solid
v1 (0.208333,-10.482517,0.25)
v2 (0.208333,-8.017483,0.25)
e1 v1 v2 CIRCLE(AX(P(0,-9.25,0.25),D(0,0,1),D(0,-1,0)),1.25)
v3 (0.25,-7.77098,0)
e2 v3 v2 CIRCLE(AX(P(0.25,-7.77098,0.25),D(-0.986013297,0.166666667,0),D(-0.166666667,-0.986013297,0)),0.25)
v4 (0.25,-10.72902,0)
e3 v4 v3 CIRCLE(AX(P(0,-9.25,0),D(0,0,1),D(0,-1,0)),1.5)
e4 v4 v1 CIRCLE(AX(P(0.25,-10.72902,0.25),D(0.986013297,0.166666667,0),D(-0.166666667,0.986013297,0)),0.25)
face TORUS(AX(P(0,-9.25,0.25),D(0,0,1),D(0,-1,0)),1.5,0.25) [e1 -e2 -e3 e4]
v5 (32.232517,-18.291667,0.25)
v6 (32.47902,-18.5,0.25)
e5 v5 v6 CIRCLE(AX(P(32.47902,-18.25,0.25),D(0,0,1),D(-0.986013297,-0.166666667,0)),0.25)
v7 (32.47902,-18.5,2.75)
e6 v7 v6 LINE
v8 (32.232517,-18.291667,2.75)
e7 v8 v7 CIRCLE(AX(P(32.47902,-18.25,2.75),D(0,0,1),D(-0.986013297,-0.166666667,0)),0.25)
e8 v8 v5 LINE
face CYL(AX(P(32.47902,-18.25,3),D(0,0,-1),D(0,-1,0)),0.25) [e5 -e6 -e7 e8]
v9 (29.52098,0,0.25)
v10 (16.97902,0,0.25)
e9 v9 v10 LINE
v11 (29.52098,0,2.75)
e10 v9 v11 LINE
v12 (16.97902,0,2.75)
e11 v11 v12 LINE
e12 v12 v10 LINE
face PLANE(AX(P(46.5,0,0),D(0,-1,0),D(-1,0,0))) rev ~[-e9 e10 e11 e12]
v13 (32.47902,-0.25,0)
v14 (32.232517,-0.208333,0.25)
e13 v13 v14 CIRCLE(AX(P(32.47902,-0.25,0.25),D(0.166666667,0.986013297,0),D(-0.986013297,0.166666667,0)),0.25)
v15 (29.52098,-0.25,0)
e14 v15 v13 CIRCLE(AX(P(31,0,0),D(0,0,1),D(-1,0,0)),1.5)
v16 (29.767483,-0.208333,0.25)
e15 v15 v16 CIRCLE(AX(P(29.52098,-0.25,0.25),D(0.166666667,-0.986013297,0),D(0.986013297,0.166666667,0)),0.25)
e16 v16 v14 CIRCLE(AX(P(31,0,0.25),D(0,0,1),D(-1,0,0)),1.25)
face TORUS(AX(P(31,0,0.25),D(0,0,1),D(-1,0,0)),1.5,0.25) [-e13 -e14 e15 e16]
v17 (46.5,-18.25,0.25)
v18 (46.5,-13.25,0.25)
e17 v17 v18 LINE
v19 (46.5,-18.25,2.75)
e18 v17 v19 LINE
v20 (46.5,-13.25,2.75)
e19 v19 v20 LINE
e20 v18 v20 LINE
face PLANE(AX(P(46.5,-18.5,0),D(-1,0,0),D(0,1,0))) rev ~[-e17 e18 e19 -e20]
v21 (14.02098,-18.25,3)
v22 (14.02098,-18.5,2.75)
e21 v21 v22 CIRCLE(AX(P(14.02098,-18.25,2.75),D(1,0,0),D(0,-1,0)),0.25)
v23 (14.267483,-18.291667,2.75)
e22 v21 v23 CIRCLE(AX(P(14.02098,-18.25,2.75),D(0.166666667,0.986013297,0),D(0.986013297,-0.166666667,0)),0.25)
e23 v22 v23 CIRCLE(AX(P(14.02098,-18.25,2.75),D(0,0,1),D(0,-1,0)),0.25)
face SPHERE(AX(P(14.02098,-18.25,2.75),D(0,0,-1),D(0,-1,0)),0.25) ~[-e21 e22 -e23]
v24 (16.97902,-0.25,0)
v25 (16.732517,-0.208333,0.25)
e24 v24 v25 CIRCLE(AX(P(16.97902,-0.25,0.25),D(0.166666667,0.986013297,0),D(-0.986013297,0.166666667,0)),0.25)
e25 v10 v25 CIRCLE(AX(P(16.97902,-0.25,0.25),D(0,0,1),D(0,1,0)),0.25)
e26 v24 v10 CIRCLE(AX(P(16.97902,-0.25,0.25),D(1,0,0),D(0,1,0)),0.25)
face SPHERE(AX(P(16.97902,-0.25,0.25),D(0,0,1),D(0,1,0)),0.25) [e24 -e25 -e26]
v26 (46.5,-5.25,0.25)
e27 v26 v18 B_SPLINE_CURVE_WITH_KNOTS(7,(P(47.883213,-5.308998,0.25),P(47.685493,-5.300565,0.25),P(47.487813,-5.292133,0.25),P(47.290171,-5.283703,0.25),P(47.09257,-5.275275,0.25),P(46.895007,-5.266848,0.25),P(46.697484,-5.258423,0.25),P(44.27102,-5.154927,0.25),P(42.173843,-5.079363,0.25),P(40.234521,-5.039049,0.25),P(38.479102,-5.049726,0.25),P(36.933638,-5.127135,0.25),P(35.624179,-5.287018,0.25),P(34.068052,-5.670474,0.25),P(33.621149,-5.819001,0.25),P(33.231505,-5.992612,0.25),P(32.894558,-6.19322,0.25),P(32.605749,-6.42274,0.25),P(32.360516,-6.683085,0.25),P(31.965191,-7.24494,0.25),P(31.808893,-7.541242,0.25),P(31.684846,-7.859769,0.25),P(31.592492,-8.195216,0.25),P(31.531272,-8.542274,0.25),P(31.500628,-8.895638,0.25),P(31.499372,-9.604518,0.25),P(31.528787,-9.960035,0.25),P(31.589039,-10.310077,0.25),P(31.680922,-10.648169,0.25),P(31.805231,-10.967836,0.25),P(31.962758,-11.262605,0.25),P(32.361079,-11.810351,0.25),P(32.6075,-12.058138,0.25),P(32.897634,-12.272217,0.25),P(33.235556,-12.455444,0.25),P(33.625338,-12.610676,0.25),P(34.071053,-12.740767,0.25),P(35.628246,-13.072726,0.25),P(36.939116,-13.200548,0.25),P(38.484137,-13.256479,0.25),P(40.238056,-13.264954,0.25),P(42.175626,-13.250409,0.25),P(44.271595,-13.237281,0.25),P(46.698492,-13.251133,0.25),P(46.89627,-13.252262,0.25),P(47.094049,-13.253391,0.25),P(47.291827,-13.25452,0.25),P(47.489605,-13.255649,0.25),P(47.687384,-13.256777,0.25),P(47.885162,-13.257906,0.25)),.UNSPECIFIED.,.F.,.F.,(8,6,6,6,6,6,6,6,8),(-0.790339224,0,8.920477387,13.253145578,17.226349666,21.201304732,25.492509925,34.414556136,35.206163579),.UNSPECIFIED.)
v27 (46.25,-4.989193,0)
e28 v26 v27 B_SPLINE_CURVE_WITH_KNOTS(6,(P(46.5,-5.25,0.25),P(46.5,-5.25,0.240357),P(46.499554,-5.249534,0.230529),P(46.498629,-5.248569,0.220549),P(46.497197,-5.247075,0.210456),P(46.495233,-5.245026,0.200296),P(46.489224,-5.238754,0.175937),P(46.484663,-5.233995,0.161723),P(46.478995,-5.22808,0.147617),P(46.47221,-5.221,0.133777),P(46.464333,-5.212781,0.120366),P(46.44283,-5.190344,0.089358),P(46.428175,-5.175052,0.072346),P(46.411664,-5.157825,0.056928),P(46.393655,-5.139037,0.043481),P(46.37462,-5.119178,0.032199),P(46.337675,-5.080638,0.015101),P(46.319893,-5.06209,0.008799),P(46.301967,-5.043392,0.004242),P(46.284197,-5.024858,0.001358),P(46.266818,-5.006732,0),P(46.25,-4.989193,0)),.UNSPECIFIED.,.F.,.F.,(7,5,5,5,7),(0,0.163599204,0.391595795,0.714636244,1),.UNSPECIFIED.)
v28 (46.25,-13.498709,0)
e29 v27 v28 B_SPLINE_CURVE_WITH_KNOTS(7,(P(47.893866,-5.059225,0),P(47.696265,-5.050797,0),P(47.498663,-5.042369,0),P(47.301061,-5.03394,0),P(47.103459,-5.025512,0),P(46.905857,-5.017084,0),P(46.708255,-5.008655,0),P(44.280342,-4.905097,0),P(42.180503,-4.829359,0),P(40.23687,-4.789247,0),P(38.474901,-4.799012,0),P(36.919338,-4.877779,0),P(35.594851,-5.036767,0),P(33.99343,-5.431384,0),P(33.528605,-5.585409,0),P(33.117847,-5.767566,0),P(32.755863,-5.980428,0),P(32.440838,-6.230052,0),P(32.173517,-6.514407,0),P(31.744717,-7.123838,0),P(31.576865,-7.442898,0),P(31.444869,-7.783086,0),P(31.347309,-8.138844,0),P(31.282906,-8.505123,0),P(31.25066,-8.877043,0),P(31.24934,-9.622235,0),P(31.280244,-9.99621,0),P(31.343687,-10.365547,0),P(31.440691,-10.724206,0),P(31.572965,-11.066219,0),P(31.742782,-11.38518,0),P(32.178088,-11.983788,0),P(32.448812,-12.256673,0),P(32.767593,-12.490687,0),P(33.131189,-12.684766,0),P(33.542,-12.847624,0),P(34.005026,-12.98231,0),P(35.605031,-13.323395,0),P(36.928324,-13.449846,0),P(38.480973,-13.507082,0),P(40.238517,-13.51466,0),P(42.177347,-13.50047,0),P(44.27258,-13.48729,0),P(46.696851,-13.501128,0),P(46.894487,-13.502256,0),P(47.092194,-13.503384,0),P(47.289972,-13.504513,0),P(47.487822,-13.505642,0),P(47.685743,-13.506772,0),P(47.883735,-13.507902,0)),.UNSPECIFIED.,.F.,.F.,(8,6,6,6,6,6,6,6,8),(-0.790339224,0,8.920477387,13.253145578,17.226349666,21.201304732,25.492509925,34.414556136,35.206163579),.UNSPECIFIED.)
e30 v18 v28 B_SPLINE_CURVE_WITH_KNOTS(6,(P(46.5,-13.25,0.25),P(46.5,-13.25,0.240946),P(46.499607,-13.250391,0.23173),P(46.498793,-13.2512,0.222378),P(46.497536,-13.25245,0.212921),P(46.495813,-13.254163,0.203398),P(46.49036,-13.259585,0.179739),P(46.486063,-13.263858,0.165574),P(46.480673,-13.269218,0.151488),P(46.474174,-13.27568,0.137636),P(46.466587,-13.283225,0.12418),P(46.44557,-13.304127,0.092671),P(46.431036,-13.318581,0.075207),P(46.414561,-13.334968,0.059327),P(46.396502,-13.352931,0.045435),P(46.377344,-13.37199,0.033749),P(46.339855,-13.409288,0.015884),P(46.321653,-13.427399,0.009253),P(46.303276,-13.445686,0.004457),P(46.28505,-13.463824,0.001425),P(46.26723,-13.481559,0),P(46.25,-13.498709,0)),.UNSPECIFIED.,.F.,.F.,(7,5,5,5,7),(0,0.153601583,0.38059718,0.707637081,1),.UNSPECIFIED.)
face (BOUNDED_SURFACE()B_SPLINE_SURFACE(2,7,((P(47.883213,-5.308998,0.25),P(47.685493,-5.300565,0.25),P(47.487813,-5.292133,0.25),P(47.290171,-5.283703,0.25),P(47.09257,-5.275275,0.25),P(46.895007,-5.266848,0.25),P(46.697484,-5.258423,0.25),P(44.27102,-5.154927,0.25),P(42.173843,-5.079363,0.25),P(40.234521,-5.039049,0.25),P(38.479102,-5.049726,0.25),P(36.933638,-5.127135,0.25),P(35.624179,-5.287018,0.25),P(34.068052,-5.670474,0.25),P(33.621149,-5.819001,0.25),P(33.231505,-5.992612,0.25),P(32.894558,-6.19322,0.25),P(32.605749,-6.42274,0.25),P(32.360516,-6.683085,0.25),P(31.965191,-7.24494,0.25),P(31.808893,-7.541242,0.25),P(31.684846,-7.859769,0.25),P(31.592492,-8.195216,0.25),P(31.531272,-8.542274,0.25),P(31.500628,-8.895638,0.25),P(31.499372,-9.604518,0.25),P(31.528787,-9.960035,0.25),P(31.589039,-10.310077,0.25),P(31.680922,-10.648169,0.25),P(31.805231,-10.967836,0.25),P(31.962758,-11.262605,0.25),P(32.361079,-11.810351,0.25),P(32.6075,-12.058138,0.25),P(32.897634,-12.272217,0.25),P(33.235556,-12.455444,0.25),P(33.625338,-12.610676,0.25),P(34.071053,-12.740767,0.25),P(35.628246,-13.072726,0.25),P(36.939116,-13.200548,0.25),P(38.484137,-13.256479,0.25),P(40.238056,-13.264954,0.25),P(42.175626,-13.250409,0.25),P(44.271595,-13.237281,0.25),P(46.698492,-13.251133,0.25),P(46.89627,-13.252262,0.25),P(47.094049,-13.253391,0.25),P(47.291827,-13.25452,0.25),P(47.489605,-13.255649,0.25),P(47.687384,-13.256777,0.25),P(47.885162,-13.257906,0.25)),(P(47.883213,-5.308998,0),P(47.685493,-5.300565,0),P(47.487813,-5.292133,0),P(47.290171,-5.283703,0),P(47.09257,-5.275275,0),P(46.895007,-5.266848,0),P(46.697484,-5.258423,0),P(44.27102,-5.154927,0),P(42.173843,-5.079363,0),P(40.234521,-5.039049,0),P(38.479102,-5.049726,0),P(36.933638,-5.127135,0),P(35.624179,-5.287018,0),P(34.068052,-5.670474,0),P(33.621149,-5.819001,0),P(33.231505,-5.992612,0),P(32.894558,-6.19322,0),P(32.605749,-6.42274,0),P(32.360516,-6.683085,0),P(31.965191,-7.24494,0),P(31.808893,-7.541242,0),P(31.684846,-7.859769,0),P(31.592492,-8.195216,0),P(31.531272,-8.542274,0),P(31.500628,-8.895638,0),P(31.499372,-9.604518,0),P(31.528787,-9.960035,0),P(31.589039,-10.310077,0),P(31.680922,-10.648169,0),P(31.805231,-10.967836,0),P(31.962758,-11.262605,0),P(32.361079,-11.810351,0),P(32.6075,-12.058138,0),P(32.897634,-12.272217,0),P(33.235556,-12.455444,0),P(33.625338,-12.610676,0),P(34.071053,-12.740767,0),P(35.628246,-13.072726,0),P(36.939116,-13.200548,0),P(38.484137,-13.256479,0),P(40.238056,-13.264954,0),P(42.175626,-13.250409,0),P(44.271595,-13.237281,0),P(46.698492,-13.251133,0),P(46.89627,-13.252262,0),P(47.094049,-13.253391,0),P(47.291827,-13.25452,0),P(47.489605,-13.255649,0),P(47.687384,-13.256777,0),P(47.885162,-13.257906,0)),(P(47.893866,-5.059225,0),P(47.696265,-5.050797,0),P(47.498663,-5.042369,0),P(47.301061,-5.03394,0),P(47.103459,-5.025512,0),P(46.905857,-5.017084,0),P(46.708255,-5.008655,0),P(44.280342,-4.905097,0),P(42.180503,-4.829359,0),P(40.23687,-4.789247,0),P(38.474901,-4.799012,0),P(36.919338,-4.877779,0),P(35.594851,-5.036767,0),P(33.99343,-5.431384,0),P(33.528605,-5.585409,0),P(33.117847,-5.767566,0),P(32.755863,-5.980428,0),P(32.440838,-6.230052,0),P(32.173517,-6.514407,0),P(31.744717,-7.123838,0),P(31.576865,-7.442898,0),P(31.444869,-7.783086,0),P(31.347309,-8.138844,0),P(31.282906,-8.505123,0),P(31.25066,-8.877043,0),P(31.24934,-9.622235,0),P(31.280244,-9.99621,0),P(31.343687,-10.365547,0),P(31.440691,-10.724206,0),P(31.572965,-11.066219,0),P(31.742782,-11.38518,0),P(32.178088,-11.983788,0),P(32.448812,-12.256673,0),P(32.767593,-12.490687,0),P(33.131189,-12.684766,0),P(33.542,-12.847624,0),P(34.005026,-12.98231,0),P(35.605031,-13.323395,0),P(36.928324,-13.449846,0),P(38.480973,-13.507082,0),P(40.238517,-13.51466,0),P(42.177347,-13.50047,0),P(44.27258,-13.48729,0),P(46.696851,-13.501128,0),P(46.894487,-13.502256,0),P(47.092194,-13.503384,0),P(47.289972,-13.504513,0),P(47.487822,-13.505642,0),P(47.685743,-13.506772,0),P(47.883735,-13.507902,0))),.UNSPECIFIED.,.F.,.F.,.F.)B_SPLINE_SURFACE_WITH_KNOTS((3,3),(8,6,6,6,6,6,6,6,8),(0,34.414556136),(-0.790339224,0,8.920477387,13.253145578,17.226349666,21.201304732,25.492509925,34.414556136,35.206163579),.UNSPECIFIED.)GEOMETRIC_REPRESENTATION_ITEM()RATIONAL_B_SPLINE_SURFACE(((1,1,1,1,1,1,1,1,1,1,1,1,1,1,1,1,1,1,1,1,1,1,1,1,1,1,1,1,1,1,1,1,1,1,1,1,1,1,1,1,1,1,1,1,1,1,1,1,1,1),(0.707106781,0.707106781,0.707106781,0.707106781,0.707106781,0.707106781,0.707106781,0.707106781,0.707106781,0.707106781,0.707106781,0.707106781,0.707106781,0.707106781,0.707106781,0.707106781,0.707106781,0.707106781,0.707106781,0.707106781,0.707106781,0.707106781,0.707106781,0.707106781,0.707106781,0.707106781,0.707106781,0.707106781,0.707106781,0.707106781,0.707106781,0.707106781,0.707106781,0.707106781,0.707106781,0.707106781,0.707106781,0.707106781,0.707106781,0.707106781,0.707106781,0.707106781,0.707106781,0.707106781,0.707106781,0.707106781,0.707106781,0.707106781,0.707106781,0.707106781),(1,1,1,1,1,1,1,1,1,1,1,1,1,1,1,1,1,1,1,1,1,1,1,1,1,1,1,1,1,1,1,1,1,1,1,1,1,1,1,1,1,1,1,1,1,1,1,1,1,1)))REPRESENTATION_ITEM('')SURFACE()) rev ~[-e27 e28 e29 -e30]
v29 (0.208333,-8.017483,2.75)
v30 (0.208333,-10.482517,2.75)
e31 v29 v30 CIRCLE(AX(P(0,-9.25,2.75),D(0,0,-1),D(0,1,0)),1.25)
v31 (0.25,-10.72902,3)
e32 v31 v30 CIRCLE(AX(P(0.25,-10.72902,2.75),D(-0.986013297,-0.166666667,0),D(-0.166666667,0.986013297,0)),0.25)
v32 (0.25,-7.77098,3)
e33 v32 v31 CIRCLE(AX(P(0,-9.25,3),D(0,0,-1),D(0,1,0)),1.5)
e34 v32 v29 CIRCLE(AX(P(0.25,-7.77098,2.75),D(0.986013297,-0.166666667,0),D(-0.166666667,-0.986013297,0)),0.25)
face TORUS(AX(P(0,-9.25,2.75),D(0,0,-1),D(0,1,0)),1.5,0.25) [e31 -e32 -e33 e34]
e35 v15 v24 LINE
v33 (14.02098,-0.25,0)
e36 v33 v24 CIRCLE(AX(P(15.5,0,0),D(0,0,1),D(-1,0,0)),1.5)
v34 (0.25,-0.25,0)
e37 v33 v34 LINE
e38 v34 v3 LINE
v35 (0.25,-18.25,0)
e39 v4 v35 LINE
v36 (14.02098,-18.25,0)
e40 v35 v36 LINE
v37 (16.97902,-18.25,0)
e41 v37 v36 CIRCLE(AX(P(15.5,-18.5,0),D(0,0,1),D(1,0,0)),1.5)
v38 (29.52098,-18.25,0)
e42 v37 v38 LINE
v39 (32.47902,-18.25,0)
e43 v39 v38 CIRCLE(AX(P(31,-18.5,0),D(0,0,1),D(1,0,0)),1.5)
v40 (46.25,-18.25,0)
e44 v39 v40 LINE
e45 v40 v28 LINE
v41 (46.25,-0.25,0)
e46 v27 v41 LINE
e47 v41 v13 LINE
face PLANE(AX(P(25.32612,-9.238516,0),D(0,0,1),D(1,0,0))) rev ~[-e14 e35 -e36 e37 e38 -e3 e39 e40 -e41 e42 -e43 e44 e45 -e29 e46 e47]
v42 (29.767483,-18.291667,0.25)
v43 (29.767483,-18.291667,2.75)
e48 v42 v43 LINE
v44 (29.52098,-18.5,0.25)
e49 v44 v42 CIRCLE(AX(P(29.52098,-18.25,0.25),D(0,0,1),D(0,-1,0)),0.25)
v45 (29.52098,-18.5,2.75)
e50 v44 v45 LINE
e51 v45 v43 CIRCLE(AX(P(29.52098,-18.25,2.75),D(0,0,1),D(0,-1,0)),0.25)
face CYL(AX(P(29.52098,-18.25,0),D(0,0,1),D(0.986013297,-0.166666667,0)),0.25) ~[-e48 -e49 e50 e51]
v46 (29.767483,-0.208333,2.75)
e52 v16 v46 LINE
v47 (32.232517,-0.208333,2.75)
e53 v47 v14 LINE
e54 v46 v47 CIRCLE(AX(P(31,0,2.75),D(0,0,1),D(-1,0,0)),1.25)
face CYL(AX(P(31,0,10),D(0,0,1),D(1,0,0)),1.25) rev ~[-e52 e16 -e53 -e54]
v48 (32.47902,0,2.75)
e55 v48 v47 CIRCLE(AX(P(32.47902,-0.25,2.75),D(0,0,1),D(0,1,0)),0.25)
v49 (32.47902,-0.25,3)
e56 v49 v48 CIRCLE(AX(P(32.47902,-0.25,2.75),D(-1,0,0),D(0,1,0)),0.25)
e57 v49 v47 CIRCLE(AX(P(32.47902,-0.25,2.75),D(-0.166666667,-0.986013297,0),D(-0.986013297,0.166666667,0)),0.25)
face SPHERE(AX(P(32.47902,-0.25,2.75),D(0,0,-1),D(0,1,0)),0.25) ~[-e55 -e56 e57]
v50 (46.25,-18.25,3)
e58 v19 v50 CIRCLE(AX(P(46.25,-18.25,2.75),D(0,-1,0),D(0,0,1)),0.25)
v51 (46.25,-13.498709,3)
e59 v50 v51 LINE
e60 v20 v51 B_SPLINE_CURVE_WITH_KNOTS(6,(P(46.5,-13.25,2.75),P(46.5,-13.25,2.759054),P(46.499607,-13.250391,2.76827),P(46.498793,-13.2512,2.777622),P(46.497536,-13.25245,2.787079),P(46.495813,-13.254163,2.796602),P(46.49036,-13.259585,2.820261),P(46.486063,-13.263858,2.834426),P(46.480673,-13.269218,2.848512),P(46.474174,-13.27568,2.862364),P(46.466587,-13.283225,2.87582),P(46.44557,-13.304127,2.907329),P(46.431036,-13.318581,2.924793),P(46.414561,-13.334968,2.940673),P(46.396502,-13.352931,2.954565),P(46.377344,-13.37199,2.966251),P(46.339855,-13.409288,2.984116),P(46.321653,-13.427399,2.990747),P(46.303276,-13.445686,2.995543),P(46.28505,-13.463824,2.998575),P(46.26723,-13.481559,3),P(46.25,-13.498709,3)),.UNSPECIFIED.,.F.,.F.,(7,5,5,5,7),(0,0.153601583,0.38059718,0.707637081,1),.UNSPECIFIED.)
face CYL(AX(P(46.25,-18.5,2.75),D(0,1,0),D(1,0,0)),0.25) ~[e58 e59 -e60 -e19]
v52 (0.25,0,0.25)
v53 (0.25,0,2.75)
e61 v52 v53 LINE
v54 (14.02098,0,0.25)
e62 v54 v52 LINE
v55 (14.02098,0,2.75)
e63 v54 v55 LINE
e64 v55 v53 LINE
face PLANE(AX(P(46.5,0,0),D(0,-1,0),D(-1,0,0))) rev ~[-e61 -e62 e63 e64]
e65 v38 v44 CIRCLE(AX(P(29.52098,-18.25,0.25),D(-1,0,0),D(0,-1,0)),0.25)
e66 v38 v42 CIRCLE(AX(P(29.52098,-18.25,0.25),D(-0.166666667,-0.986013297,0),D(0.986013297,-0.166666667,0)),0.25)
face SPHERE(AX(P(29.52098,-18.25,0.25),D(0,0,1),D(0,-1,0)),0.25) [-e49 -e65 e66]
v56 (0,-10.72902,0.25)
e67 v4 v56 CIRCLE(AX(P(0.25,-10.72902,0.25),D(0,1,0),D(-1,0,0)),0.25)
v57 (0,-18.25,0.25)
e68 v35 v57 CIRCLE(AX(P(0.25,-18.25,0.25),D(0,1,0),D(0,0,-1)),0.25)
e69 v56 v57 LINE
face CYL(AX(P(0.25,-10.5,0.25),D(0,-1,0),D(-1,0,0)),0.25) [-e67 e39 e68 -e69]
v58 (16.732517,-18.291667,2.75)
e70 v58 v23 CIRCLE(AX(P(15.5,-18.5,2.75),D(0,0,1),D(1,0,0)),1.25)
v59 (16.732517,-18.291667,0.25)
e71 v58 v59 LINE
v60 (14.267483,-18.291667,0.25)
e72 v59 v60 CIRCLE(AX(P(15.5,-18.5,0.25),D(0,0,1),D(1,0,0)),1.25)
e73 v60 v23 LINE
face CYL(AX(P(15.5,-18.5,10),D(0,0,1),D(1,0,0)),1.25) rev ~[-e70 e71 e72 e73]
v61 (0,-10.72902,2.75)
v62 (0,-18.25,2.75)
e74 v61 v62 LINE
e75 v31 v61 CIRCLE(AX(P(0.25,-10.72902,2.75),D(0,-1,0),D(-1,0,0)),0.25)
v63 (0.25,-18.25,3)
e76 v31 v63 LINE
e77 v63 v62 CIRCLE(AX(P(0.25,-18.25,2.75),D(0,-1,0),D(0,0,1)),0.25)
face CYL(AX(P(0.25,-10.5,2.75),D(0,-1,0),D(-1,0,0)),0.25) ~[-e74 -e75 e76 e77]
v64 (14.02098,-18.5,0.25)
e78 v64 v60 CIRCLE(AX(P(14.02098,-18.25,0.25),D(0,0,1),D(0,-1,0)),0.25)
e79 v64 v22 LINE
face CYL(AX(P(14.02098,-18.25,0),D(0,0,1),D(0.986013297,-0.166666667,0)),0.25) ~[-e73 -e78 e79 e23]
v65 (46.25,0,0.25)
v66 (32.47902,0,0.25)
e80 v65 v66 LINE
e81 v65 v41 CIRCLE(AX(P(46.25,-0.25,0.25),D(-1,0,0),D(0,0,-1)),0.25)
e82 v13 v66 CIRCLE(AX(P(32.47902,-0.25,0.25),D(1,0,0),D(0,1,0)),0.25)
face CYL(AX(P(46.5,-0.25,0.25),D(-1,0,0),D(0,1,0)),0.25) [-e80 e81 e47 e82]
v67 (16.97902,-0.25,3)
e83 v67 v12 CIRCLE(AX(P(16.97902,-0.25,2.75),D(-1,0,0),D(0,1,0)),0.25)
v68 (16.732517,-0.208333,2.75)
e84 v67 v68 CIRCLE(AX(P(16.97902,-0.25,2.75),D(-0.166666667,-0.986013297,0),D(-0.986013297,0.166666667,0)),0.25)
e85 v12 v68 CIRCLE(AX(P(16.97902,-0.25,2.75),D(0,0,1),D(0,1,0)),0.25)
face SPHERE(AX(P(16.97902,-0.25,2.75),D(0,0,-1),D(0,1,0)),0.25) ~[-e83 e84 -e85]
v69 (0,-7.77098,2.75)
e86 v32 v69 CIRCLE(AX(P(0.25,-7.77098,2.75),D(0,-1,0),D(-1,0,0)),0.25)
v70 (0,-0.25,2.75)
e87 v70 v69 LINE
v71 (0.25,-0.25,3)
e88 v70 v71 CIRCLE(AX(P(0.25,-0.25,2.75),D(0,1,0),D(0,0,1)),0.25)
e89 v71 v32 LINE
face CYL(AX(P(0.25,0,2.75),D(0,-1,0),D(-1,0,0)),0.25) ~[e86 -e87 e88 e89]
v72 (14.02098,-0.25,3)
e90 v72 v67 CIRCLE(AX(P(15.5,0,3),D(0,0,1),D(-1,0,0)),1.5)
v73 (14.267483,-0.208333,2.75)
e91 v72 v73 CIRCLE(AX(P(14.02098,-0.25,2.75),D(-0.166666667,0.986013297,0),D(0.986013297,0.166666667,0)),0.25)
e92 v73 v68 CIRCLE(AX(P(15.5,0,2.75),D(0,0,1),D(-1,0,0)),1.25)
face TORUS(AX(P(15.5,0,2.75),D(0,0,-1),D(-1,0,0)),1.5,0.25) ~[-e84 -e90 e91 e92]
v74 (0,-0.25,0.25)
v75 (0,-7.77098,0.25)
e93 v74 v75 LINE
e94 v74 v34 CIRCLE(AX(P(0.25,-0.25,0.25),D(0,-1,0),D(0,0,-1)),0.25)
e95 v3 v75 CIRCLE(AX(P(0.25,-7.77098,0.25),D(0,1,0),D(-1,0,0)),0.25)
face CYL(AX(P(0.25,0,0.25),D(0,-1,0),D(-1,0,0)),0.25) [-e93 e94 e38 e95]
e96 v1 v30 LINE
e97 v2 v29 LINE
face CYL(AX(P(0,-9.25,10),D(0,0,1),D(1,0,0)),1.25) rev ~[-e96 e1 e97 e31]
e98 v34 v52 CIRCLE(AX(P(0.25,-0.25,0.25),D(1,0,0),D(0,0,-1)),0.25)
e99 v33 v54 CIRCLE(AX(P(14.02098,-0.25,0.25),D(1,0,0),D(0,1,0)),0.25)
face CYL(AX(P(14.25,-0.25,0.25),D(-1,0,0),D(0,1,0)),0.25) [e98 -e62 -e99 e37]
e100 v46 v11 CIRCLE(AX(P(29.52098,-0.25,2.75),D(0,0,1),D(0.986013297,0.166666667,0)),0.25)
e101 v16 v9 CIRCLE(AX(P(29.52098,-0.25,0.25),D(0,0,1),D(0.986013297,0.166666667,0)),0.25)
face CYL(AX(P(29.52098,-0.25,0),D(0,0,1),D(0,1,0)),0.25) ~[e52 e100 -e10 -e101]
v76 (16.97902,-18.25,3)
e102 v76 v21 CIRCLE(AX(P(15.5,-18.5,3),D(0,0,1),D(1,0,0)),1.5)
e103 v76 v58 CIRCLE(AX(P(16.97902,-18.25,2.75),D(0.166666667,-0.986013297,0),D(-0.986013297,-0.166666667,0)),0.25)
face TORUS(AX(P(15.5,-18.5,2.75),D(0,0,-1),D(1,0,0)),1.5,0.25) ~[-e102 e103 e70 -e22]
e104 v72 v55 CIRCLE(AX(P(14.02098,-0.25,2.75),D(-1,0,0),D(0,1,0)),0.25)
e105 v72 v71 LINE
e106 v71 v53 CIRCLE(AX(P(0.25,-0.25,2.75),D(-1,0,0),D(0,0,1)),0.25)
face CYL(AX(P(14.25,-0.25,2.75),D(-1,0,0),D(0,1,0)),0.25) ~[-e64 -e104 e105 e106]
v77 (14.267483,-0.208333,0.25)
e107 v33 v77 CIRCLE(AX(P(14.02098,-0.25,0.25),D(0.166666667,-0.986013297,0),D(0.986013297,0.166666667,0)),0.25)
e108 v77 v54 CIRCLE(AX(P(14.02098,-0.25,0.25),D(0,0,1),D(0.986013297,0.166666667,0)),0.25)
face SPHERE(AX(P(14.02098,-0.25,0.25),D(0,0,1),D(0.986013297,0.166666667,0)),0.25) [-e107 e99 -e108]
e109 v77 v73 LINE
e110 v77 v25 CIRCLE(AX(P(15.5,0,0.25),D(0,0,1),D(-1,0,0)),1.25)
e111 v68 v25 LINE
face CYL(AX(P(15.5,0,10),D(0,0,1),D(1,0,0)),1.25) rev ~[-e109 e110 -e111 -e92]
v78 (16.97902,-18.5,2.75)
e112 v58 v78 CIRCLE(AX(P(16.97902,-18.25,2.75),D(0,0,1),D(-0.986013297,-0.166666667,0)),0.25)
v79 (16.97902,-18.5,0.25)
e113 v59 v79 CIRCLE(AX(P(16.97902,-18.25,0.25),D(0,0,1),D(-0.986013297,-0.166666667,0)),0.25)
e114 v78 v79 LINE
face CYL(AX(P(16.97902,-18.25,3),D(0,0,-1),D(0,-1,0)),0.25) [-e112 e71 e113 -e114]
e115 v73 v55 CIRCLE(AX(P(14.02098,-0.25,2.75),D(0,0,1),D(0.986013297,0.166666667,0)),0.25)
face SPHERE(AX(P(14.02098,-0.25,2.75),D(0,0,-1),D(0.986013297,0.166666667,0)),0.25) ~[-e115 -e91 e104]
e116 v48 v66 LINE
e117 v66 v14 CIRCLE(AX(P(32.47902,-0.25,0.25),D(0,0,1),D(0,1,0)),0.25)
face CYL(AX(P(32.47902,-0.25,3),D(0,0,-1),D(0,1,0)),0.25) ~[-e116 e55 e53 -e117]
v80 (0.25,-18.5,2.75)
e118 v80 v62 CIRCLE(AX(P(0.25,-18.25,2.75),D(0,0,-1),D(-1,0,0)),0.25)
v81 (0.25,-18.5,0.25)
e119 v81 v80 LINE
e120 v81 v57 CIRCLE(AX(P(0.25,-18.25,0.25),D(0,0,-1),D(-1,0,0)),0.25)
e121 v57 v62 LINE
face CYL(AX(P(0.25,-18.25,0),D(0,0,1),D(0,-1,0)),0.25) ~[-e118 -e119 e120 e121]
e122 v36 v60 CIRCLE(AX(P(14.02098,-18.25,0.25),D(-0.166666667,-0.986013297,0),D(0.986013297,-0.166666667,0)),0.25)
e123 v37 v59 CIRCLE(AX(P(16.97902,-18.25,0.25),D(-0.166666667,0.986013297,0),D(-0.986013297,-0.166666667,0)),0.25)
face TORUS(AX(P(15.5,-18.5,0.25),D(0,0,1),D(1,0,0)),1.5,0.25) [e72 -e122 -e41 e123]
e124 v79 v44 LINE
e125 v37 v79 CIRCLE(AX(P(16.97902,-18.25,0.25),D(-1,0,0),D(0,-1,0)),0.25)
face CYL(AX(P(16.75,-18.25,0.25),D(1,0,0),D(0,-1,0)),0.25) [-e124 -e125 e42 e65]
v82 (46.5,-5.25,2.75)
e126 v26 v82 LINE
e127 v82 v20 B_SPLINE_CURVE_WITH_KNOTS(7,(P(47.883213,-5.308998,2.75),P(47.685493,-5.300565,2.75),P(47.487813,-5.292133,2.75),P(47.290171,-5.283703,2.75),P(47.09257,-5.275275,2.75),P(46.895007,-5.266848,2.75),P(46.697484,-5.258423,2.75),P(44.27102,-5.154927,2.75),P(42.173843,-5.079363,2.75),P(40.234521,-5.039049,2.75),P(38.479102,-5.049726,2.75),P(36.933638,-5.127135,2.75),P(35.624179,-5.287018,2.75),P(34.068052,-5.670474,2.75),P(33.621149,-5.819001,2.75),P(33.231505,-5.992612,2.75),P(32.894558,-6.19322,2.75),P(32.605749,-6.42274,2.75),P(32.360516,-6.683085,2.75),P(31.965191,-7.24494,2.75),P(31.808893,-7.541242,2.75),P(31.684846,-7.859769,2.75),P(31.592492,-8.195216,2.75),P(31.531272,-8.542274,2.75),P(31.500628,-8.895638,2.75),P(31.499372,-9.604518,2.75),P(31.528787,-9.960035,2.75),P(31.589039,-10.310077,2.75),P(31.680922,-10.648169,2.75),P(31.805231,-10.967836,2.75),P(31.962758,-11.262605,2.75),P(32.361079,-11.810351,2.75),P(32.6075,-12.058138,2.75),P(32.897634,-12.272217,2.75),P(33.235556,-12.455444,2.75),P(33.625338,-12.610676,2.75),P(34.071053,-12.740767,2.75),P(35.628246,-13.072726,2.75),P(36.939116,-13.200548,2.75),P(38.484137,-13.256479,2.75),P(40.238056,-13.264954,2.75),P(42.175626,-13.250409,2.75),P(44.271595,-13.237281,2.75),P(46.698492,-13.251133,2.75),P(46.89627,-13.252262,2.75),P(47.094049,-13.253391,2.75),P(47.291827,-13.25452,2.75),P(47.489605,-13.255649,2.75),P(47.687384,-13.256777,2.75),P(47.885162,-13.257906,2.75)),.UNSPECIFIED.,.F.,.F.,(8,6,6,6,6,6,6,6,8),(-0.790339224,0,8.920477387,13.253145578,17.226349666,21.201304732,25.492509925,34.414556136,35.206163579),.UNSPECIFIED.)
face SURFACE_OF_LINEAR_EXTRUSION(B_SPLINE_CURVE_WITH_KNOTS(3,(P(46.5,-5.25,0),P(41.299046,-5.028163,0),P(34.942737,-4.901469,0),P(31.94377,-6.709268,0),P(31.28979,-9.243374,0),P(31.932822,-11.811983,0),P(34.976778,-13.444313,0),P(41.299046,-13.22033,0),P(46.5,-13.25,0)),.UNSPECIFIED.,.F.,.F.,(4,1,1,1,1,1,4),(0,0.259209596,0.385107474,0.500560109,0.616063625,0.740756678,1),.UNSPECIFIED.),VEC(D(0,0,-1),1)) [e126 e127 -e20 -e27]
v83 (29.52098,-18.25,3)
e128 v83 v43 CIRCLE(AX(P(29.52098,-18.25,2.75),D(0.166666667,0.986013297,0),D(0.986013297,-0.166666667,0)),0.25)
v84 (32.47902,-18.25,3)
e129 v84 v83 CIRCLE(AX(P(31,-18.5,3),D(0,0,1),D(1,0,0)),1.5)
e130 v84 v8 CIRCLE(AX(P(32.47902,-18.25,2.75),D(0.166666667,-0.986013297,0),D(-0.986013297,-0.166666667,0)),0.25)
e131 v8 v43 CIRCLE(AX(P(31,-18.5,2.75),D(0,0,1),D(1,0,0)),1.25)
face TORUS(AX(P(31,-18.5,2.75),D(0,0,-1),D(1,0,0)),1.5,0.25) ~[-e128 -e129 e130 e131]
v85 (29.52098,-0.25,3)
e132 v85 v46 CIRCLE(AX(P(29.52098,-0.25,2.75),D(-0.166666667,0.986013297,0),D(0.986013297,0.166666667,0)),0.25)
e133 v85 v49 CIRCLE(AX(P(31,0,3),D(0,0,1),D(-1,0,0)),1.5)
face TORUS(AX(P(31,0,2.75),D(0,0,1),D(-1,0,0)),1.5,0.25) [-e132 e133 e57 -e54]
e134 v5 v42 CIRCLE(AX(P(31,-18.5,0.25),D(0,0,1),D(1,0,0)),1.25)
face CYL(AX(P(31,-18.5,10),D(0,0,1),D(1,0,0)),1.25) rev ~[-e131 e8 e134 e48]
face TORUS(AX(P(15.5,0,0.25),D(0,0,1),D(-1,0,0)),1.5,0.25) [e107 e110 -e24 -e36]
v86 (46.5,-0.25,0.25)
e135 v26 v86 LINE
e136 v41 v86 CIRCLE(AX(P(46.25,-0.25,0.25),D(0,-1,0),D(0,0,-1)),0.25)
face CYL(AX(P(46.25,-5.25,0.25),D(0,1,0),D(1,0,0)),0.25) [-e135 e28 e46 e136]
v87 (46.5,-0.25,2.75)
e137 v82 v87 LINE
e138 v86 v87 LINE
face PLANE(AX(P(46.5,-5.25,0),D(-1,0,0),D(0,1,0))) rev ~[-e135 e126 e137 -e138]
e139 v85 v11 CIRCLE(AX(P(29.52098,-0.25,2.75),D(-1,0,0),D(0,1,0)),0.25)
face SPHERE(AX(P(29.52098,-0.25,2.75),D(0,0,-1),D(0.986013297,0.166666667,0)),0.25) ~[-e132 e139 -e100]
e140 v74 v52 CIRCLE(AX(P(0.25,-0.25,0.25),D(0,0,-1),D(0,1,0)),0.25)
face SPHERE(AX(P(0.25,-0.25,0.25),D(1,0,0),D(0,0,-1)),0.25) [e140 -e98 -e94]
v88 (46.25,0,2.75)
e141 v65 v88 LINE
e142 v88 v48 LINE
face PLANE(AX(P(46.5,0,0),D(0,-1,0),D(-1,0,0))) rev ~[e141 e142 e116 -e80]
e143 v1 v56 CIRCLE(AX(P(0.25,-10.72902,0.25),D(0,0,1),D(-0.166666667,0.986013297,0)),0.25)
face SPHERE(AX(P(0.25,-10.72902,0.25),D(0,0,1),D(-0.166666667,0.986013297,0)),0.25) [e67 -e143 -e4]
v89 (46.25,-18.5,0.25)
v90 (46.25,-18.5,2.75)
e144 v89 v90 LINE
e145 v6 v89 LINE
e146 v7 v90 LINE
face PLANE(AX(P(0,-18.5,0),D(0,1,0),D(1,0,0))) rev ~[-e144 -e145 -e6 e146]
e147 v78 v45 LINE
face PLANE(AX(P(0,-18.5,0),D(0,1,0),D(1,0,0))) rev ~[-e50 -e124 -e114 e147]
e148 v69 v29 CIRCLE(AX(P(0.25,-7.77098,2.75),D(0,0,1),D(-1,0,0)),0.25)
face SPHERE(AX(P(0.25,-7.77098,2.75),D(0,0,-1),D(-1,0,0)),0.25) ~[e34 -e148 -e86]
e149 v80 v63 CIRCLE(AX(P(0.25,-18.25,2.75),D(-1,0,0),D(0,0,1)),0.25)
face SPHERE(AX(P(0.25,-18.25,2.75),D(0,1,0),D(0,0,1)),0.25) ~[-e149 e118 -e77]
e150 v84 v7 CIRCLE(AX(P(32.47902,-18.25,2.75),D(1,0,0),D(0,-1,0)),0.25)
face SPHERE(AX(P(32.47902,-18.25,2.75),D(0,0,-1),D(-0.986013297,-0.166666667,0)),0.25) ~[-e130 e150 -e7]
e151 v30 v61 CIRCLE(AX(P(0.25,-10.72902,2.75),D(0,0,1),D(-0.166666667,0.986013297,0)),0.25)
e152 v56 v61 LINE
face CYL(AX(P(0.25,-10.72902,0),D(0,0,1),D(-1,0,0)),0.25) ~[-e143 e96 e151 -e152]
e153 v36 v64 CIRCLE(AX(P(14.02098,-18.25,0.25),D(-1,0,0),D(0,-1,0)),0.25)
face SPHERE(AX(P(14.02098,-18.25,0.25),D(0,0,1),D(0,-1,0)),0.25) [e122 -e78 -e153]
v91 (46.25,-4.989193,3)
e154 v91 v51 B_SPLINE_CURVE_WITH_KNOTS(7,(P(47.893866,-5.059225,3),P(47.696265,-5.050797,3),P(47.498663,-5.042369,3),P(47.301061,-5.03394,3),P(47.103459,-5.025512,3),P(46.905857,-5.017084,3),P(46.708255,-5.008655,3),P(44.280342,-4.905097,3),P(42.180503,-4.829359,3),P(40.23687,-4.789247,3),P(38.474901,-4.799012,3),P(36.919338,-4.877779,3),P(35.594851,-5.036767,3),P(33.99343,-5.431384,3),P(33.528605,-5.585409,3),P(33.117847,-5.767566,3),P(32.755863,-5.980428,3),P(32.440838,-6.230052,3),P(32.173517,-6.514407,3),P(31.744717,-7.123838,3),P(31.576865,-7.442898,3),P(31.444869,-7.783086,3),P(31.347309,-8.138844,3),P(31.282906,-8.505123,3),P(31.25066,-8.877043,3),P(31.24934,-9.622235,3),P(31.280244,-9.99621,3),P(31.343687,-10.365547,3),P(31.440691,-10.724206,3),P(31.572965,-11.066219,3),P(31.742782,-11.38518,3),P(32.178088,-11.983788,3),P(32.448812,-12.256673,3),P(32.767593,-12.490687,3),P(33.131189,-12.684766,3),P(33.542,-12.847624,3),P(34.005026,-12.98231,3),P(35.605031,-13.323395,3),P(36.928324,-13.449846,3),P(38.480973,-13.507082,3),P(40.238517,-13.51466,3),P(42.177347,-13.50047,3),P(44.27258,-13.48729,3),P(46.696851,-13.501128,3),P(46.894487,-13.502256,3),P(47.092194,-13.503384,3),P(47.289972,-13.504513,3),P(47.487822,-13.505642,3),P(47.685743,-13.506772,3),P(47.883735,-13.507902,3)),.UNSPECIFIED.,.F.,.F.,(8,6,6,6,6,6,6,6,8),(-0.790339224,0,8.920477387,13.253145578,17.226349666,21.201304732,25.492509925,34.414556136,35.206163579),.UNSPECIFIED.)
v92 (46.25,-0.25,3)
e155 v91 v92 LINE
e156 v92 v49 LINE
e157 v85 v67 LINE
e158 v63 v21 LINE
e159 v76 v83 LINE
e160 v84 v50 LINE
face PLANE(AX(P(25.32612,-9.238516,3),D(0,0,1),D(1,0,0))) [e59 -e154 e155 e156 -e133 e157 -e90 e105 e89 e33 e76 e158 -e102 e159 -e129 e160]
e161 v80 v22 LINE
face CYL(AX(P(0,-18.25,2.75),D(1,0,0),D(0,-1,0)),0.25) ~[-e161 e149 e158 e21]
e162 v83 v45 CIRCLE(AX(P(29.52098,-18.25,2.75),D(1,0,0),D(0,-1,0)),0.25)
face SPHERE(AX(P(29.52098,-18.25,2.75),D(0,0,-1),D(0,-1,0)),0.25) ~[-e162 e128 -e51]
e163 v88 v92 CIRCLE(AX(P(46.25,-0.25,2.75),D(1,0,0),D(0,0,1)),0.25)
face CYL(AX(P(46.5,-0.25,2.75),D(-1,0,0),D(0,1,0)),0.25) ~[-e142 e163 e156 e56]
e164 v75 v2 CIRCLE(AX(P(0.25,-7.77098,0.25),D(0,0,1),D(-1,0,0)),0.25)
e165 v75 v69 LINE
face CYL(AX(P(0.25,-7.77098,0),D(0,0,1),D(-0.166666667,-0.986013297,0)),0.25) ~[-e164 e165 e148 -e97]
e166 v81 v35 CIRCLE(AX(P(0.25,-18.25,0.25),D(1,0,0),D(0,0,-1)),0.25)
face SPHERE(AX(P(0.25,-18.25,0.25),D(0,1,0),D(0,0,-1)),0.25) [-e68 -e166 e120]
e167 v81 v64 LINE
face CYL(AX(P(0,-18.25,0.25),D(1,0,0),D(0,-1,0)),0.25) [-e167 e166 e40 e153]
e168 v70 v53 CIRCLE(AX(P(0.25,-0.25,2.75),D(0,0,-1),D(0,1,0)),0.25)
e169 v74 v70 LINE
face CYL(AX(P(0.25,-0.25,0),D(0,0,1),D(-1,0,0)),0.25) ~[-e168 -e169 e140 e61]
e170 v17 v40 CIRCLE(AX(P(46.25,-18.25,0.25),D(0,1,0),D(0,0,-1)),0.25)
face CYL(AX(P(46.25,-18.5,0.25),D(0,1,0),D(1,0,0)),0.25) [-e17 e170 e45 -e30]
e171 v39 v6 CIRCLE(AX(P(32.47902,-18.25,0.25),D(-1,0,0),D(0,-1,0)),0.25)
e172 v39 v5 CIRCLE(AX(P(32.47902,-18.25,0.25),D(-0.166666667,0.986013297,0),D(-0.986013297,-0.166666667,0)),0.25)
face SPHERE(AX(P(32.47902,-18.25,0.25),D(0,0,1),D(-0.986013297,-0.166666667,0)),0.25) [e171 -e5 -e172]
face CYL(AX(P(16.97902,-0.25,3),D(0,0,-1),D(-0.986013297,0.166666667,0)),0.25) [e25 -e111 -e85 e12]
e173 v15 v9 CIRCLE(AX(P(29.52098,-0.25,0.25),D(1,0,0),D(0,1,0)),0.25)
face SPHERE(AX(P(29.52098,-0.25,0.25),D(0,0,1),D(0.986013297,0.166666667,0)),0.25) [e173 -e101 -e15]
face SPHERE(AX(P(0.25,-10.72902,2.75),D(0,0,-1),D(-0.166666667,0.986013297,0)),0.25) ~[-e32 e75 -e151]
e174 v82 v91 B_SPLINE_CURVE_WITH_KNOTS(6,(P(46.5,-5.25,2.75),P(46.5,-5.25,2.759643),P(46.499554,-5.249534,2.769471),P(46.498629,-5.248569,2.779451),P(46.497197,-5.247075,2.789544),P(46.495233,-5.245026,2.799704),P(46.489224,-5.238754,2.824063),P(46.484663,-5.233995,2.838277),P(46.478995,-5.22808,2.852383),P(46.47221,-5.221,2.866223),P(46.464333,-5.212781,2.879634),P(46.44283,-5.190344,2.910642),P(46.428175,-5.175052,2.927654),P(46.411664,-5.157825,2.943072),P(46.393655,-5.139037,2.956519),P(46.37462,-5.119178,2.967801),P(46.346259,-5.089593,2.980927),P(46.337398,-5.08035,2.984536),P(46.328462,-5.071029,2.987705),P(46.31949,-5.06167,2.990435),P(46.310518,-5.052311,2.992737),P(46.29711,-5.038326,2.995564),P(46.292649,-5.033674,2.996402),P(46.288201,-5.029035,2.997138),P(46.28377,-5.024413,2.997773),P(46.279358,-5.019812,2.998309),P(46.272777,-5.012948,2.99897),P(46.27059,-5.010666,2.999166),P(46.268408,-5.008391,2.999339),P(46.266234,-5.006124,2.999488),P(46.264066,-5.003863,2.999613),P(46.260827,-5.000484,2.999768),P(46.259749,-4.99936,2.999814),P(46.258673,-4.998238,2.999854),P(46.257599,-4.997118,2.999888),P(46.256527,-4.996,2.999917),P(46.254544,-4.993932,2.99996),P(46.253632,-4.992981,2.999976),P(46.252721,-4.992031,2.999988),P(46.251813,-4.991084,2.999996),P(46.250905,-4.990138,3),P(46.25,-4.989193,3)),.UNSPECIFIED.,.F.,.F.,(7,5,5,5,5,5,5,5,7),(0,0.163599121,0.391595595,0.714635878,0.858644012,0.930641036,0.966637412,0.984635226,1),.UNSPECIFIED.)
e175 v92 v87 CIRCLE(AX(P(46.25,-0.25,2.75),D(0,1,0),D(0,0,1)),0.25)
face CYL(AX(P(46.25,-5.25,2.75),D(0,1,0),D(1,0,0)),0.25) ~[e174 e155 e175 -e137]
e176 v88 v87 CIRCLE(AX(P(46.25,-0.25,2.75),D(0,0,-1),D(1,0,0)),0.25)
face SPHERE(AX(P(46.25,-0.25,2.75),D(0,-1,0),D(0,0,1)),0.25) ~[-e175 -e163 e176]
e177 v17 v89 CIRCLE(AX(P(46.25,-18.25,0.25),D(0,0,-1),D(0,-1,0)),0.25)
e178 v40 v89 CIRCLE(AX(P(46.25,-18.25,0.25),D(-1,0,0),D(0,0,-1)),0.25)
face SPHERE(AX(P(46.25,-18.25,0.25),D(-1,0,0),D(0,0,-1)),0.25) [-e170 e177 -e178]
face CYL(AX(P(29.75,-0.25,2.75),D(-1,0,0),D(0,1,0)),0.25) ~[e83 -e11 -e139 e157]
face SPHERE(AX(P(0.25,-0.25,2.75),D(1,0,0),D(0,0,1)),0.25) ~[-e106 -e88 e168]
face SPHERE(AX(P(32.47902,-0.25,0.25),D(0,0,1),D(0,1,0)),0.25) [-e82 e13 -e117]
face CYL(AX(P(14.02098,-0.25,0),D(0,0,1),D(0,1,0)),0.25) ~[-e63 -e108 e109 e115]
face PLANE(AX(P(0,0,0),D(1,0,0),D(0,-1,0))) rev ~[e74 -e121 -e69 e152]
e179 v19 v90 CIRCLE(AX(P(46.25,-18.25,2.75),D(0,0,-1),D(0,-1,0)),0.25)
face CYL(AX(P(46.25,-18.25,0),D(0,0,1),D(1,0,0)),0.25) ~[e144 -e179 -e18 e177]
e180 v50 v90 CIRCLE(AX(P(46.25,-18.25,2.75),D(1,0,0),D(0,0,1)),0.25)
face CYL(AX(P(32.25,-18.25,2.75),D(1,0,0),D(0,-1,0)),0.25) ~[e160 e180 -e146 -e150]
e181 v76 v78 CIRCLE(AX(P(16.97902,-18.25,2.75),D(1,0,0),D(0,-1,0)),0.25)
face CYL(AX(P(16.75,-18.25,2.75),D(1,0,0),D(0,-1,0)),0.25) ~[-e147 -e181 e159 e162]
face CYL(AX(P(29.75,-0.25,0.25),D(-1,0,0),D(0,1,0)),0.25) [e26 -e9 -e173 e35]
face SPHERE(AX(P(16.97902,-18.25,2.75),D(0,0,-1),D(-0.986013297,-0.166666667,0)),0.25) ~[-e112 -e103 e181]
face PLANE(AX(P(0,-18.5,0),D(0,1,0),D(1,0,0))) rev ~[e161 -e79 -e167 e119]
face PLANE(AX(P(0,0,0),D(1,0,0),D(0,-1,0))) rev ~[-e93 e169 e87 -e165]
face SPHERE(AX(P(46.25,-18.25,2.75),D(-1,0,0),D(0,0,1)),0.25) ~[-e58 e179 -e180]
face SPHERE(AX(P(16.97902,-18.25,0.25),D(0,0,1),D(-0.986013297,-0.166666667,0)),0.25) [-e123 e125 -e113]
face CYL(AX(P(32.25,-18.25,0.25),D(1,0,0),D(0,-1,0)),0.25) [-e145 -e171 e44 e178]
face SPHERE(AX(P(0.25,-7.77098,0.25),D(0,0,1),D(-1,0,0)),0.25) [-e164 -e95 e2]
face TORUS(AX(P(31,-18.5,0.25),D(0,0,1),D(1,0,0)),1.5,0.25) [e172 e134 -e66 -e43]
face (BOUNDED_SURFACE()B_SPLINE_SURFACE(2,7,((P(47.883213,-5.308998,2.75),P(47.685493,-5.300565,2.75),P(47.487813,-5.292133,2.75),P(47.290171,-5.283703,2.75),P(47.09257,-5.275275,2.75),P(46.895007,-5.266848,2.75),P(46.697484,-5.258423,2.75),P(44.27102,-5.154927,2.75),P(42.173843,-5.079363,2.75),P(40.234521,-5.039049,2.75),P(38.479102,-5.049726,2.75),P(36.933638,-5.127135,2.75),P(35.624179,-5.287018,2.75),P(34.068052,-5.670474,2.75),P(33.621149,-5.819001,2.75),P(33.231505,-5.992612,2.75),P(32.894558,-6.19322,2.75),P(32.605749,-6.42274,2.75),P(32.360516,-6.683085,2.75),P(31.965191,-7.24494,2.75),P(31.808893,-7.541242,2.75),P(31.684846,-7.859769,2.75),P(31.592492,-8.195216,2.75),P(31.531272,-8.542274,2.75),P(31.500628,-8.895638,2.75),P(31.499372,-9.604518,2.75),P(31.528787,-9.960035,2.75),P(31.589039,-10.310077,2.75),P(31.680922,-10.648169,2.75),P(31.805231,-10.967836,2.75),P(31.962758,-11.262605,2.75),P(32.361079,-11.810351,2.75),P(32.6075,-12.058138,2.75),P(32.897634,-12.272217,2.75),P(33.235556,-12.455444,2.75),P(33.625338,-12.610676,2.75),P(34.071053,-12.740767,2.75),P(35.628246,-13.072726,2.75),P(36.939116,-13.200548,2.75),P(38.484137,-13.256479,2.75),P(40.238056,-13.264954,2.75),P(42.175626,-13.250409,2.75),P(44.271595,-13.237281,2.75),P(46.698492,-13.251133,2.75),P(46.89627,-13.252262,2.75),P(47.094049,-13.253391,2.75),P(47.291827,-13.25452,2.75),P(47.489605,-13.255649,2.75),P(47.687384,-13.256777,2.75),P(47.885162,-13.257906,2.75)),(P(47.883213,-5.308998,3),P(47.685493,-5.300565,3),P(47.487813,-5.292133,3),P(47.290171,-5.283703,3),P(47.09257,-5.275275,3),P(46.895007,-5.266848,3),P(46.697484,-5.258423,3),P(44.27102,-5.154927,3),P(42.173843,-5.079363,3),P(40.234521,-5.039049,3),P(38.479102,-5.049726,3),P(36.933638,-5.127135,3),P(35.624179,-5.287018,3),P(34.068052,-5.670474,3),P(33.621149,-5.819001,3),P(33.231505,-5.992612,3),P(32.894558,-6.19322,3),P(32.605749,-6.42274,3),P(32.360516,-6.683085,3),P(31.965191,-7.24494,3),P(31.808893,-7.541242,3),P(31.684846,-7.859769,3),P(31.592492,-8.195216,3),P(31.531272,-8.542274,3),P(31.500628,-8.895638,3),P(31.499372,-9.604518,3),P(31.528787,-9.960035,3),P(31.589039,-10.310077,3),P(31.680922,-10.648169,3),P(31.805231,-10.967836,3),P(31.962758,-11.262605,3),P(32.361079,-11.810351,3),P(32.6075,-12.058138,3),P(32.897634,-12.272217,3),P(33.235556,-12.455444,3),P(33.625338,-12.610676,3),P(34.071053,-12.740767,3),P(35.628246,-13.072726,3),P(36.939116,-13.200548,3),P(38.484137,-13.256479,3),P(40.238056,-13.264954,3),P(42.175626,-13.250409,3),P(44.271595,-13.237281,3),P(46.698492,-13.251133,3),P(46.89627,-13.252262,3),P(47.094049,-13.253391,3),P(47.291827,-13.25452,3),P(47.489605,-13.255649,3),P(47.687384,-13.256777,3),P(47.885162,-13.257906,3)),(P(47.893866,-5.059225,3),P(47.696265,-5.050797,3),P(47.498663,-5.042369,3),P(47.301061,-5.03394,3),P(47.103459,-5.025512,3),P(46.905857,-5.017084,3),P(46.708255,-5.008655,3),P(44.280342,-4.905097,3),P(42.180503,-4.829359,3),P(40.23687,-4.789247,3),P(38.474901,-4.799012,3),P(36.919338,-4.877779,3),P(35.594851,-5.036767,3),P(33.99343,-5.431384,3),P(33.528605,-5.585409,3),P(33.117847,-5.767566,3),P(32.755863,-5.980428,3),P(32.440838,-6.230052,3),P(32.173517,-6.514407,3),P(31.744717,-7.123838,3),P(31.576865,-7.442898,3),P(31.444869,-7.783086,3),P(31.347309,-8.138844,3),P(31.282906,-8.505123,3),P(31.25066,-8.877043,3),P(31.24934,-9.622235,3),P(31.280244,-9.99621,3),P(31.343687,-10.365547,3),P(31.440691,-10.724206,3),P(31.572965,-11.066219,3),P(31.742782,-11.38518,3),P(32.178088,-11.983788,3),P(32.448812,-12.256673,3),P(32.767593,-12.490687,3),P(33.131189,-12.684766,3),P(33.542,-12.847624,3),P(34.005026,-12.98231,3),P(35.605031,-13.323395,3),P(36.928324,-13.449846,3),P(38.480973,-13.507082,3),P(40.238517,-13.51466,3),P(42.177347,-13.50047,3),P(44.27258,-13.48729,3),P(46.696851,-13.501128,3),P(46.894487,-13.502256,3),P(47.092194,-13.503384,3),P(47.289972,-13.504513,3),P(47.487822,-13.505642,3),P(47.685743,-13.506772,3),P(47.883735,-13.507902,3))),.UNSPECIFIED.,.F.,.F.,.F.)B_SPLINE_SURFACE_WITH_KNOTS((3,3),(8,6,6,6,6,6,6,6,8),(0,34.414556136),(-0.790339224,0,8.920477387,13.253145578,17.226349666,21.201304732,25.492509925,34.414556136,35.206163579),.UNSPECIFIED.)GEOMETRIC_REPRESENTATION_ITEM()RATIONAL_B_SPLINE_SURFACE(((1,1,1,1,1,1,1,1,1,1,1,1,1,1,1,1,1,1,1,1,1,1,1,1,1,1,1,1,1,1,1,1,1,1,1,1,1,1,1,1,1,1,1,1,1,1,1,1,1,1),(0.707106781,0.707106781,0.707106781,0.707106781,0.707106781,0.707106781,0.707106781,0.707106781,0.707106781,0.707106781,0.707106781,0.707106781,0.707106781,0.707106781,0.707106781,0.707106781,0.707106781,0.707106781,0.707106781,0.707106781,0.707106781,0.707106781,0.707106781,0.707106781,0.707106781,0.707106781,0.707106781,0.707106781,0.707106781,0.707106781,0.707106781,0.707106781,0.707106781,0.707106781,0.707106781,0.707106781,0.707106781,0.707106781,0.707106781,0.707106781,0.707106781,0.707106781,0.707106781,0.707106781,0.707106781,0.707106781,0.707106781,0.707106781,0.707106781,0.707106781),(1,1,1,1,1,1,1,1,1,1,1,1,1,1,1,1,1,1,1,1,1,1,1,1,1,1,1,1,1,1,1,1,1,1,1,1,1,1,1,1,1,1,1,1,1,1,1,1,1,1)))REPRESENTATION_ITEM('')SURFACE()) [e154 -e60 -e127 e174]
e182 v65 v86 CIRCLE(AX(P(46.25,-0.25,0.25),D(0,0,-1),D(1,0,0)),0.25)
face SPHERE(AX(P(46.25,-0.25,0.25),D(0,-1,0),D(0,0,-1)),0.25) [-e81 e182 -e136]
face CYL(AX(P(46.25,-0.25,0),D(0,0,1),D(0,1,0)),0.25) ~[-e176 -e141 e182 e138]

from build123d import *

# Parameters (mm, degrees)
F1_DEPTH = 3
F3_R     = 1.25
F4_R     = 1.25
F5_DEPTH = 25
F6_R     = 0.25


# Not quite as in the source:
# - a feature names something its author has since deleted; it is built from what else it names


with BuildPart() as f1:
    # F0 (on Top) → F1 (new body)
    with BuildSketch(Plane.XY):
        with BuildLine():
            Line((46.5, 0), (0, 0))
            Line((0, 0), (0, -18.5))
            Line((0, -18.5), (46.5, -18.5))
            Line((46.5, -18.5), (46.5, -13.25))
            add(Edge.make_bspline(
                [(46.5, -5.25), (41.2990462595, -5.0281633415), (34.9427373095, -4.9014690119), (31.9437700839, -6.7092677561), (31.2897903129, -9.2433737757), (31.9328215802, -11.811983406), (34.9767779409, -13.4443128539), (41.2990462595, -13.2203298325), (46.5, -13.25)],
                knots=[0, 0, 0, 0, 0.2592095959, 0.3851074736, 0.5005601093, 0.6160636246, 0.7407566781, 1, 1, 1, 1], degree=3))
            Line((46.5, -5.25), (46.5, 0))
        make_face()
    extrude(amount=F1_DEPTH)

    # F3 (on offset) + F4 (on offset) → F5 (cut)
    with BuildSketch(Plane.XY.offset(10)):
        with Locations((0, -9.25)):
            Circle(F3_R)
    with BuildSketch(Plane.XY.offset(10)):
        with Locations((15.5, 0)):
            Circle(F4_R)
        with Locations((31, 0)):
            Circle(F4_R)
        with Locations((15.5, -18.5)):
            Circle(F4_R)
        with Locations((31, -18.5)):
            Circle(F4_R)
    extrude(amount=-F5_DEPTH, mode=Mode.SUBTRACT)

    # F6
    f6_edges = [f1.edges().sort_by_distance(p)[0] for p in [
        (46.5, -2.625, 3),
        (39.375, 0, 3),
        (31, -1.25, 3),
        (23.25, 0, 3),
        (15.5, -1.25, 3),
        (7.125, 0, 3),
        (0, -4, 3),
        (1.25, -9.25, 3),
        (0, -14.5, 3),
        (7.125, -18.5, 3),
        (15.5, -17.25, 3),
        (23.25, -18.5, 3),
        (31, -17.25, 3),
        (39.375, -18.5, 3),
        (46.5, -15.875, 3),
        (31.500144, -9.220228, 3),
        (46.5, -2.625, 0),
        (39.375, 0, 0),
        (31, -1.25, 0),
        (23.25, 0, 0),
        (15.5, -1.25, 0),
        (7.125, 0, 0),
        (0, -4, 0),
        (1.25, -9.25, 0),
        (0, -14.5, 0),
        (7.125, -18.5, 0),
        (15.5, -17.25, 0),
        (23.25, -18.5, 0),
        (31, -17.25, 0),
        (39.375, -18.5, 0),
        (46.5, -15.875, 0),
        (31.500144, -9.220228, 0),
        (46.5, 0, 1.5),
        (46.5, -18.5, 1.5),
        (32.25, -18.5, 1.5),
        (29.75, -18.5, 1.5),
        (16.75, -18.5, 1.5),
        (14.25, -18.5, 1.5),
        (0, -18.5, 1.5),
        (0, -10.5, 1.5),
        (0, -8, 1.5),
        (0, 0, 1.5),
        (14.25, 0, 1.5),
        (16.75, 0, 1.5),
        (32.25, 0, 1.5),
        (29.75, 0, 1.5),
    ]]
    fillet(f6_edges, radius=F6_R)


solid = f1.part
